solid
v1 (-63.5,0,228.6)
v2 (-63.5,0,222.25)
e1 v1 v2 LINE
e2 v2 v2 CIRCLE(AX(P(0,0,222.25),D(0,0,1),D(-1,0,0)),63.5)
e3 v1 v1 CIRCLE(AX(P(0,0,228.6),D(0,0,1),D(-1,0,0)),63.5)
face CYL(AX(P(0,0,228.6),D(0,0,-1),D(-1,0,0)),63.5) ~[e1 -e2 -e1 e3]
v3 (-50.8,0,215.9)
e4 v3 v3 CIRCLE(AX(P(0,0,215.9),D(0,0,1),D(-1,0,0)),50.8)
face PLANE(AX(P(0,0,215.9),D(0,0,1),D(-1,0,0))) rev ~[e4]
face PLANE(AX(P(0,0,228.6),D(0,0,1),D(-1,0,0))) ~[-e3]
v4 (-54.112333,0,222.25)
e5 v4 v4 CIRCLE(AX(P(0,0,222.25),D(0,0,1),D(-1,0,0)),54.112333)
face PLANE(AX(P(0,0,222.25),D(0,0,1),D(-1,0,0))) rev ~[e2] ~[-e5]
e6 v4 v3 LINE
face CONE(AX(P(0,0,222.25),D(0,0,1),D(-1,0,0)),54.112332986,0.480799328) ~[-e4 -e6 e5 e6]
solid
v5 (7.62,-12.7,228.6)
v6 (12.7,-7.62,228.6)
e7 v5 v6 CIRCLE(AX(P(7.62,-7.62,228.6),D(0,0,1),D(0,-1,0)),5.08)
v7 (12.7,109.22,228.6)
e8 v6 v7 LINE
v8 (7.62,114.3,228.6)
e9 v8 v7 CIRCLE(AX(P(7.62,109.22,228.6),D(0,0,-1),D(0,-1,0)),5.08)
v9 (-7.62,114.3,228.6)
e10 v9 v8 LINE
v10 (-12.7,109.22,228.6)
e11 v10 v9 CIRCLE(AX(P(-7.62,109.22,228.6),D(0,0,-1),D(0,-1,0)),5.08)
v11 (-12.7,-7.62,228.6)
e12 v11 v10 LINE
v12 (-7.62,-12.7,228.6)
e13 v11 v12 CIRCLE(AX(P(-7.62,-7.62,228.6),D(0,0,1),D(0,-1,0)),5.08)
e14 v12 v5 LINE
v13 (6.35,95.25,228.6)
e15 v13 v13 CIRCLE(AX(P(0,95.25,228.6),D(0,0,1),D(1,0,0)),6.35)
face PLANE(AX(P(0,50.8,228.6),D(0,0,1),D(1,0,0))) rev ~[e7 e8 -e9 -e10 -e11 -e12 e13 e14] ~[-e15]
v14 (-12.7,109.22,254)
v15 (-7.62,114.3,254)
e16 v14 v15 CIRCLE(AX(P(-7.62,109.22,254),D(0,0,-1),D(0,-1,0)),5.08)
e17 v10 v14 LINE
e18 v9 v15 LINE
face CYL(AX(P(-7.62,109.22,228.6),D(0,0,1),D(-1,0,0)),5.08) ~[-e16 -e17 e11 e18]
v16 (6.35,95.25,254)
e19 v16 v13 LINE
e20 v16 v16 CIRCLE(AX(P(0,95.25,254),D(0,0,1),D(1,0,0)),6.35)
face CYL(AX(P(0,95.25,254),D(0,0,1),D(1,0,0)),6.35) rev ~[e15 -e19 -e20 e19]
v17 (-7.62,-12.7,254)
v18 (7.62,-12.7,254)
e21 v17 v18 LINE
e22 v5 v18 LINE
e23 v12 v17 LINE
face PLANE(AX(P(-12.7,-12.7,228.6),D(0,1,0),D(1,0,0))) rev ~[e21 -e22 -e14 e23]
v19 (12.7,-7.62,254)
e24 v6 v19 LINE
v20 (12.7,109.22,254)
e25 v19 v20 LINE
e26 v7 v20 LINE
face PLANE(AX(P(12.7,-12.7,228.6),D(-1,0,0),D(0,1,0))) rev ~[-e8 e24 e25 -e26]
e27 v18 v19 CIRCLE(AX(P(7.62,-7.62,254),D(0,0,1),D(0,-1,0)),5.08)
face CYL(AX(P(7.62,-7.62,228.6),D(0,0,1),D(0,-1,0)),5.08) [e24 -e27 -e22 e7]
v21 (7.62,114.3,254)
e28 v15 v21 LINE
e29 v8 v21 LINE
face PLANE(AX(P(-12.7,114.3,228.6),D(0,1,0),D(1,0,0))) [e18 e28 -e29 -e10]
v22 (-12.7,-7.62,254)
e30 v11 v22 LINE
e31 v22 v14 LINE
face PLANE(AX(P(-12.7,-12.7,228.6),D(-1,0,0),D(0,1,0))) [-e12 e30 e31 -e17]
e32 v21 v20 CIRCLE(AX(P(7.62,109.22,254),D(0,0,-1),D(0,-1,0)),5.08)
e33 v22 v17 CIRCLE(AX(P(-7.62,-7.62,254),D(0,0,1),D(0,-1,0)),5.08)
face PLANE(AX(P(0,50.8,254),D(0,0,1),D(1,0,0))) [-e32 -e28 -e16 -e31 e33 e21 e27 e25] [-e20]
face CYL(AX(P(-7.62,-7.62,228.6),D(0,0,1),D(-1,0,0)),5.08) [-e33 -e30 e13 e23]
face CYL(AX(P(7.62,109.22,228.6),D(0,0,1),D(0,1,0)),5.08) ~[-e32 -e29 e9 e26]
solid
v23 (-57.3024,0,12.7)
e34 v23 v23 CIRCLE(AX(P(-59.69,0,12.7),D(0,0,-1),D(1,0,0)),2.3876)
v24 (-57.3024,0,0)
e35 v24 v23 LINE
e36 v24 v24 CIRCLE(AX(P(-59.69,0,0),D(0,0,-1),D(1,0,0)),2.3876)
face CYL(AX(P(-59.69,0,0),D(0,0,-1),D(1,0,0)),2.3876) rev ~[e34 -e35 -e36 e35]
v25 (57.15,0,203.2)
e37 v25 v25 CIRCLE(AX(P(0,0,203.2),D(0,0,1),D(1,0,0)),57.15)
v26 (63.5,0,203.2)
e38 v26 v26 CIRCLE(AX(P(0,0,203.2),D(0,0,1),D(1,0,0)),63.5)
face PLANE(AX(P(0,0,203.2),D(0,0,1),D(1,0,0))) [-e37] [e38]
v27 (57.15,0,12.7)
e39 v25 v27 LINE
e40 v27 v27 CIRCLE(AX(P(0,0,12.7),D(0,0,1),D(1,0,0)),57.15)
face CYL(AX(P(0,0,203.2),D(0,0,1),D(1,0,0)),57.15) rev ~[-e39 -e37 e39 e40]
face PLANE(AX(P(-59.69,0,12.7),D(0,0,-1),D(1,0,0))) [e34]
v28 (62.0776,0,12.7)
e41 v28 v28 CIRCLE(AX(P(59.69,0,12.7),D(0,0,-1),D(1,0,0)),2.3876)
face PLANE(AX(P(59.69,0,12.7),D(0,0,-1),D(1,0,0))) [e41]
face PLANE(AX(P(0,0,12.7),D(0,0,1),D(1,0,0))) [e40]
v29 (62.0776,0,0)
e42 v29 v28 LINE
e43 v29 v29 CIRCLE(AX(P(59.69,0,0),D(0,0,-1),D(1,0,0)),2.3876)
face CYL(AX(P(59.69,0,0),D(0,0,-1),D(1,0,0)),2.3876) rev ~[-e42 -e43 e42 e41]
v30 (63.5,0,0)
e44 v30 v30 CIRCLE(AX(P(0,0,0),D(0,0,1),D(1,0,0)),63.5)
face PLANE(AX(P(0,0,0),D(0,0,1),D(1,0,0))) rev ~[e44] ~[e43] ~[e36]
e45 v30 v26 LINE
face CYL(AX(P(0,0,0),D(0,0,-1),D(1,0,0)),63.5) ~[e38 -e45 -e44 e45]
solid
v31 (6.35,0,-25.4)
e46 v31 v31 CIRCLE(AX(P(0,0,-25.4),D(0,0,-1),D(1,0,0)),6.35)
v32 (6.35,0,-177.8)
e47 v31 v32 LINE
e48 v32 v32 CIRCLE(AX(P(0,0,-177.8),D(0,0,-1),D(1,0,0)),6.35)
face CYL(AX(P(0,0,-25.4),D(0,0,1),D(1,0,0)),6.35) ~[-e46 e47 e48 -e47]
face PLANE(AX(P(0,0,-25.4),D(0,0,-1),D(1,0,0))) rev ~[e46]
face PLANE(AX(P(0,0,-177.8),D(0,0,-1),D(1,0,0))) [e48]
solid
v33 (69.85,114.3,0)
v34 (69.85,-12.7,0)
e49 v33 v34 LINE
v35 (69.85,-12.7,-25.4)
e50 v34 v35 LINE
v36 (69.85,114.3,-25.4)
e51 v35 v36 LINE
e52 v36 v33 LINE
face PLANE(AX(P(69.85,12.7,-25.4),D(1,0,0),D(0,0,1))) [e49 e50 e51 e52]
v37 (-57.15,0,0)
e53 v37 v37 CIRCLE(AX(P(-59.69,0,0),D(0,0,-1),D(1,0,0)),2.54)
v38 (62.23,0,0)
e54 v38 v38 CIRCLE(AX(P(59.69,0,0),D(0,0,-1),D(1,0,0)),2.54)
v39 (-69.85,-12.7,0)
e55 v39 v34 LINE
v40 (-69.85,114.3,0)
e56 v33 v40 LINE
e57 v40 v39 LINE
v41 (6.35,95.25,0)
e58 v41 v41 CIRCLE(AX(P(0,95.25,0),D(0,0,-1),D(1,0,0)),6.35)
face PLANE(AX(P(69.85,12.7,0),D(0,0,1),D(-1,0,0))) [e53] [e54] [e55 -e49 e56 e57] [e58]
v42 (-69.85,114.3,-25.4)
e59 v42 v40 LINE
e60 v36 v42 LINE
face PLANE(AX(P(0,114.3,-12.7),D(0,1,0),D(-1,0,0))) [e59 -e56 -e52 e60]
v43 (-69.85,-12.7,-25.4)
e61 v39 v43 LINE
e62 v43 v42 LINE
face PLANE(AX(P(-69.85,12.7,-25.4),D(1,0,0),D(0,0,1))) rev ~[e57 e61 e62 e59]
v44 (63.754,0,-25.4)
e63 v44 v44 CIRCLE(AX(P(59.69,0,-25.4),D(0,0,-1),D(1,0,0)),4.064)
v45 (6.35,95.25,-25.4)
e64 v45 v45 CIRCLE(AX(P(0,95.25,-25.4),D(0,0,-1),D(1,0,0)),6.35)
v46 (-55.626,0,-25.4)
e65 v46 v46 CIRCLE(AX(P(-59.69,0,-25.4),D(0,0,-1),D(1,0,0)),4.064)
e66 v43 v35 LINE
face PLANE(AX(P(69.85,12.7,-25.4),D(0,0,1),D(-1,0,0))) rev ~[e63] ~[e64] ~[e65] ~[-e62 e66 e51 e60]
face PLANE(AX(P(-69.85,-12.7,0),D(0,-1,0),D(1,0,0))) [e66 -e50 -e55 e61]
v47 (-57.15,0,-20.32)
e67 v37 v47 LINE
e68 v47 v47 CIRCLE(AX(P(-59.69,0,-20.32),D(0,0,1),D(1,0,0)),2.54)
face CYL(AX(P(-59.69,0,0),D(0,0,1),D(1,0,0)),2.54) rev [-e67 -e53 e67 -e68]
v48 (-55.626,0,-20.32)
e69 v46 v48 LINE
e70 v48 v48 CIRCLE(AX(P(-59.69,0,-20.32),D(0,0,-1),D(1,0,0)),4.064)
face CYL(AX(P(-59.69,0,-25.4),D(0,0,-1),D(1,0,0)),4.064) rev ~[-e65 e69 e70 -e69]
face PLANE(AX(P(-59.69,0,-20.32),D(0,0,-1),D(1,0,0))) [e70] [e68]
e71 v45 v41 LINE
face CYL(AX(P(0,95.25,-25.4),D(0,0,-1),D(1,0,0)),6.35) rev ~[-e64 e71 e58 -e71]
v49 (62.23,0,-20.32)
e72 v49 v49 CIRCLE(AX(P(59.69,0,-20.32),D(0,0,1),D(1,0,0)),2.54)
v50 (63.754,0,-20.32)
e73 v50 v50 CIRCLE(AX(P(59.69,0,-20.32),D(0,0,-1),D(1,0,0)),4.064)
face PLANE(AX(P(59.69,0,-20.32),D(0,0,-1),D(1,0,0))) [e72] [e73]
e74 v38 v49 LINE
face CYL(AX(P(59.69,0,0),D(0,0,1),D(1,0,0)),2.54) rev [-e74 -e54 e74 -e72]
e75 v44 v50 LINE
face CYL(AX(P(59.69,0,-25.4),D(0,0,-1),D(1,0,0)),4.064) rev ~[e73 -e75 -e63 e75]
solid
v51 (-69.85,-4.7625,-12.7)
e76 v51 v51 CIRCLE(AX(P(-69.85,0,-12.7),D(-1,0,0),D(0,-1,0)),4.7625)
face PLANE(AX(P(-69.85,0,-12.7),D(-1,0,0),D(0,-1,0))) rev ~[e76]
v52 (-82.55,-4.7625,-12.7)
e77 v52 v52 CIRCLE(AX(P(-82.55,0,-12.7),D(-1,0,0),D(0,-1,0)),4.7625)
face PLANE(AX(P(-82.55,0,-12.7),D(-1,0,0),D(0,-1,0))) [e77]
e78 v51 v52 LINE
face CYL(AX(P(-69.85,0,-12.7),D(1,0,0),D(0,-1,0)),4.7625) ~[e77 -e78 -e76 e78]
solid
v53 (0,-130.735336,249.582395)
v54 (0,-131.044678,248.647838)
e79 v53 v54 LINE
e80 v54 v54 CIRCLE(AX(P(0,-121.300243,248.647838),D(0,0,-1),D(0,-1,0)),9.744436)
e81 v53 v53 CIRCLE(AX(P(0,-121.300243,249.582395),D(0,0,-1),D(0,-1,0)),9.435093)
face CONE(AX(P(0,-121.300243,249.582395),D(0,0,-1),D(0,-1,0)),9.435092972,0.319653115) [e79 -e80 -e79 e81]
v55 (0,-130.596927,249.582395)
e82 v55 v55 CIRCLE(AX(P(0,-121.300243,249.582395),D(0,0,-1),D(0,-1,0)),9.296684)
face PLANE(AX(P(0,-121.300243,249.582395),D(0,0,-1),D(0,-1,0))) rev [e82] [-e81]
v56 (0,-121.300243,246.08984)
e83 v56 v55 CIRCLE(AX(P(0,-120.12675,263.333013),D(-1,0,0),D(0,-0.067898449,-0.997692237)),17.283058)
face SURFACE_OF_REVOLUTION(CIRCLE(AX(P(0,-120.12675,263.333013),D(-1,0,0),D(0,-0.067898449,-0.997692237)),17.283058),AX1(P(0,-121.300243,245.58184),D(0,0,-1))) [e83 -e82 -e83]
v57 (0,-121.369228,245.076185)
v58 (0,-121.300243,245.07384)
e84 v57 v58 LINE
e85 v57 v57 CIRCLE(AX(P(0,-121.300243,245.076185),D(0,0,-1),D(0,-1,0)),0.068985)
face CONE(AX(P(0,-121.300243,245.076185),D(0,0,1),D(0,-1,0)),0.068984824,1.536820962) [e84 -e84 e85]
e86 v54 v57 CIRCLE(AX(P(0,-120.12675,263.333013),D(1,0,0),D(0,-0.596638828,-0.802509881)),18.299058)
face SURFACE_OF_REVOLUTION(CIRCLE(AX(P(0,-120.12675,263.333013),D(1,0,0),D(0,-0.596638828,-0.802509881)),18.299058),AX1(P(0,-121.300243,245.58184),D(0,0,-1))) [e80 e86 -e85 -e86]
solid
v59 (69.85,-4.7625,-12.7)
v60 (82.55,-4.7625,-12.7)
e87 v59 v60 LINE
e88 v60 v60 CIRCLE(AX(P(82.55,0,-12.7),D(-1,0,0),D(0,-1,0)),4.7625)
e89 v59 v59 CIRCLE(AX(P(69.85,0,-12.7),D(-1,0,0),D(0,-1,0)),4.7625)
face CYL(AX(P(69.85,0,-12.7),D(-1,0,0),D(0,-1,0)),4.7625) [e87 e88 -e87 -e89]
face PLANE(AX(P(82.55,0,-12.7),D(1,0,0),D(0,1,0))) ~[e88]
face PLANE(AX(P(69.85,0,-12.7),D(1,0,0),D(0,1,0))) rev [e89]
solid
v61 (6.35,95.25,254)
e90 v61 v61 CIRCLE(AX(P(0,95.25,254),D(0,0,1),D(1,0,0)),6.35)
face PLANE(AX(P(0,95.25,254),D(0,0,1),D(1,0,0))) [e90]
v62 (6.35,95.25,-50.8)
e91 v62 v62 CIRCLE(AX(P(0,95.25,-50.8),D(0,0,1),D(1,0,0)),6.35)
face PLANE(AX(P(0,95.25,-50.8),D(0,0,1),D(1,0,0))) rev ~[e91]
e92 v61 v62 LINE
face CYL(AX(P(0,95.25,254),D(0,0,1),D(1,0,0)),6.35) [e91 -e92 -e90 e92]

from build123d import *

# Parameters (mm, degrees)
F0_R      = 63.5
F1_DEPTH  = 203.2
F2_R      = 57.15
F3_DEPTH  = 190.5
F7_R      = 2.3876
F8_DEPTH  = 12.7
F9_W      = 139.7
F9_H      = 25.4
F9_R      = 2.54
F10_DEPTH = 25.4
F11_R     = 4.064
F12_DEPTH = 5.08
F14_R     = 6.35
F15_DEPTH = 152.4
F16_W     = 25.4
F16_H     = 127
F17_DEPTH = 25.4
F18_R     = 6.35
F19_DEPTH = 25.4
F20_R     = 6.35
F21_DEPTH = 304.8
F22_R     = 5.08
F23_W     = 139.7
F23_H     = 25.4
F24_DEPTH = 101.6
F25_R     = 6.35
F26_DEPTH = 279.401
F13_R     = 4.7625
F29_DEPTH = 12.7


with BuildPart() as f1:
    # F0 (on Top) → F1 (new body)
    with BuildSketch(Plane.XY):
        Circle(F0_R)
    extrude(amount=F1_DEPTH)

    # F2 (on face) → F3 (cut)
    with BuildSketch(Plane.XY.offset(203.2)):
        Circle(F2_R)
    extrude(amount=-F3_DEPTH, mode=Mode.SUBTRACT)

    # F7 (on face) → F8 (cut)
    with BuildSketch(Plane(origin=(0, 0, 0), x_dir=(1, 0, 0), z_dir=(0, 0, -1))):
        with Locations((-59.69, 0)):
            Circle(F7_R)
        with Locations((59.69, 0)):
            Circle(F7_R)
    extrude(amount=-F8_DEPTH, mode=Mode.SUBTRACT)


with BuildPart() as f6:
    # F5 (on Front) → F6 (revolve)
    with BuildSketch(Plane.XZ):
        Polygon((0, 215.9), (0, 228.6), (-63.5, 228.6), (-63.5, 222.25), (-54.1123329857, 222.25), (-50.8, 215.9), align=None)
    revolve(axis=Axis((0, 0, 222.25), (0, 0, 1)))


with BuildPart() as f10:
    # F9 (on face) → F10 (new body)
    with BuildSketch(Plane(origin=(0, 0, 0), x_dir=(1, 0, 0), z_dir=(0, 0, -1))):
        Rectangle(F9_W, F9_H)
        with Locations((-59.69, 0)):
            Circle(F9_R, mode=Mode.SUBTRACT)
        with Locations((59.69, 0)):
            Circle(F9_R, mode=Mode.SUBTRACT)
    extrude(amount=F10_DEPTH)

    # F11 (on face) → F12 (cut)
    with BuildSketch(Plane(origin=(0, 0, -25.4), x_dir=(1, 0, 0), z_dir=(0, 0, -1))):
        with Locations((-59.69, 0)):
            Circle(F11_R)
        with Locations((59.69, 0)):
            Circle(F11_R)
    extrude(amount=-F12_DEPTH, mode=Mode.SUBTRACT)

    # F23 (on face) → F24 (join)
    with BuildSketch(Plane(origin=(0, 12.7, 0), x_dir=(-1, 0, 0), z_dir=(0, 1, 0))):
        with Locations((0, -12.7)):
            Rectangle(F23_W, F23_H)
    extrude(amount=F24_DEPTH)

    # F25 (on face) → F26 (cut, through all)
    with BuildSketch(Plane(origin=(0, 0, -25.4), x_dir=(1, 0, 0), z_dir=(0, 0, -1))):
        with Locations((0, -95.25)):
            Circle(F25_R)
    extrude(amount=-F26_DEPTH, mode=Mode.SUBTRACT)


with BuildPart() as f15:
    # F14 (on face) → F15 (new body)
    with BuildSketch(Plane(origin=(0, 0, -25.4), x_dir=(1, 0, 0), z_dir=(0, 0, -1))):
        Circle(F14_R)
    extrude(amount=F15_DEPTH)


with BuildPart() as f17:
    # F16 (on face) → F17 (new body)
    with BuildSketch(Plane.XY.offset(228.6)):
        with Locations((0, 50.8)):
            Rectangle(F16_W, F16_H)
    extrude(amount=F17_DEPTH)

    # F18 (on face) → F19 (cut)
    with BuildSketch(Plane.XY.offset(254)):
        with Locations((0, 95.25)):
            Circle(F18_R)
    extrude(amount=-F19_DEPTH, mode=Mode.SUBTRACT)

    # F22
    f22_edges = [f17.edges().sort_by_distance(p)[0] for p in [
        (-12.7, -12.7, 241.3),
        (12.7, -12.7, 241.3),
        (12.7, 114.3, 241.3),
        (-12.7, 114.3, 241.3),
    ]]
    fillet(f22_edges, radius=F22_R)


with BuildPart() as f21:
    # F20 (on offset) → F21 (new body)
    with BuildSketch(Plane.XY.offset(254)):
        with Locations((0, 95.25)):
            Circle(F20_R)
    extrude(amount=-F21_DEPTH)


with BuildPart() as f28:
    # F27 (on Right) → F28 (revolve)
    with BuildSketch(Plane.YZ):
        with BuildLine():
            Line((-121.3002428412, 245.0738400221), (-121.3002428412, 246.0898400221))
            ThreePointArc((-121.3002428412, 246.0898400221), (-126.2048455265, 247.1539878791), (-130.5969267216, 249.5823949575))
            Line((-130.5969267216, 249.5823949575), (-130.7353358137, 249.5823949575))
            Line((-130.7353358137, 249.5823949575), (-131.0446783728, 248.6478379131))
            ThreePointArc((-131.0446783728, 248.6478379131), (-126.4637875903, 246.1662578068), (-121.3692276655, 245.0761847089))
            Line((-121.3692276655, 245.0761847089), (-121.3002428412, 245.0738400221))
        make_face()
    revolve(axis=Axis((0, -121.3002428412, 245.5818400221), (0, 0, -1)))


with BuildPart() as f29:
    # F13 (on face) → F29 (new body)
    with BuildSketch(Plane(origin=(-69.85, 0, 0), x_dir=(0, -1, 0), z_dir=(-1, 0, 0))):
        with Locations((0, -12.7)):
            Circle(F13_R)
    extrude(amount=F29_DEPTH)


with BuildPart() as f30_1:
    # F30: instance of F29
    add(f29.part.mirror(Plane.YZ))


solid = Compound([f1.part, f6.part, f10.part, f15.part, f17.part, f21.part, f28.part, f29.part, f30_1.part])
